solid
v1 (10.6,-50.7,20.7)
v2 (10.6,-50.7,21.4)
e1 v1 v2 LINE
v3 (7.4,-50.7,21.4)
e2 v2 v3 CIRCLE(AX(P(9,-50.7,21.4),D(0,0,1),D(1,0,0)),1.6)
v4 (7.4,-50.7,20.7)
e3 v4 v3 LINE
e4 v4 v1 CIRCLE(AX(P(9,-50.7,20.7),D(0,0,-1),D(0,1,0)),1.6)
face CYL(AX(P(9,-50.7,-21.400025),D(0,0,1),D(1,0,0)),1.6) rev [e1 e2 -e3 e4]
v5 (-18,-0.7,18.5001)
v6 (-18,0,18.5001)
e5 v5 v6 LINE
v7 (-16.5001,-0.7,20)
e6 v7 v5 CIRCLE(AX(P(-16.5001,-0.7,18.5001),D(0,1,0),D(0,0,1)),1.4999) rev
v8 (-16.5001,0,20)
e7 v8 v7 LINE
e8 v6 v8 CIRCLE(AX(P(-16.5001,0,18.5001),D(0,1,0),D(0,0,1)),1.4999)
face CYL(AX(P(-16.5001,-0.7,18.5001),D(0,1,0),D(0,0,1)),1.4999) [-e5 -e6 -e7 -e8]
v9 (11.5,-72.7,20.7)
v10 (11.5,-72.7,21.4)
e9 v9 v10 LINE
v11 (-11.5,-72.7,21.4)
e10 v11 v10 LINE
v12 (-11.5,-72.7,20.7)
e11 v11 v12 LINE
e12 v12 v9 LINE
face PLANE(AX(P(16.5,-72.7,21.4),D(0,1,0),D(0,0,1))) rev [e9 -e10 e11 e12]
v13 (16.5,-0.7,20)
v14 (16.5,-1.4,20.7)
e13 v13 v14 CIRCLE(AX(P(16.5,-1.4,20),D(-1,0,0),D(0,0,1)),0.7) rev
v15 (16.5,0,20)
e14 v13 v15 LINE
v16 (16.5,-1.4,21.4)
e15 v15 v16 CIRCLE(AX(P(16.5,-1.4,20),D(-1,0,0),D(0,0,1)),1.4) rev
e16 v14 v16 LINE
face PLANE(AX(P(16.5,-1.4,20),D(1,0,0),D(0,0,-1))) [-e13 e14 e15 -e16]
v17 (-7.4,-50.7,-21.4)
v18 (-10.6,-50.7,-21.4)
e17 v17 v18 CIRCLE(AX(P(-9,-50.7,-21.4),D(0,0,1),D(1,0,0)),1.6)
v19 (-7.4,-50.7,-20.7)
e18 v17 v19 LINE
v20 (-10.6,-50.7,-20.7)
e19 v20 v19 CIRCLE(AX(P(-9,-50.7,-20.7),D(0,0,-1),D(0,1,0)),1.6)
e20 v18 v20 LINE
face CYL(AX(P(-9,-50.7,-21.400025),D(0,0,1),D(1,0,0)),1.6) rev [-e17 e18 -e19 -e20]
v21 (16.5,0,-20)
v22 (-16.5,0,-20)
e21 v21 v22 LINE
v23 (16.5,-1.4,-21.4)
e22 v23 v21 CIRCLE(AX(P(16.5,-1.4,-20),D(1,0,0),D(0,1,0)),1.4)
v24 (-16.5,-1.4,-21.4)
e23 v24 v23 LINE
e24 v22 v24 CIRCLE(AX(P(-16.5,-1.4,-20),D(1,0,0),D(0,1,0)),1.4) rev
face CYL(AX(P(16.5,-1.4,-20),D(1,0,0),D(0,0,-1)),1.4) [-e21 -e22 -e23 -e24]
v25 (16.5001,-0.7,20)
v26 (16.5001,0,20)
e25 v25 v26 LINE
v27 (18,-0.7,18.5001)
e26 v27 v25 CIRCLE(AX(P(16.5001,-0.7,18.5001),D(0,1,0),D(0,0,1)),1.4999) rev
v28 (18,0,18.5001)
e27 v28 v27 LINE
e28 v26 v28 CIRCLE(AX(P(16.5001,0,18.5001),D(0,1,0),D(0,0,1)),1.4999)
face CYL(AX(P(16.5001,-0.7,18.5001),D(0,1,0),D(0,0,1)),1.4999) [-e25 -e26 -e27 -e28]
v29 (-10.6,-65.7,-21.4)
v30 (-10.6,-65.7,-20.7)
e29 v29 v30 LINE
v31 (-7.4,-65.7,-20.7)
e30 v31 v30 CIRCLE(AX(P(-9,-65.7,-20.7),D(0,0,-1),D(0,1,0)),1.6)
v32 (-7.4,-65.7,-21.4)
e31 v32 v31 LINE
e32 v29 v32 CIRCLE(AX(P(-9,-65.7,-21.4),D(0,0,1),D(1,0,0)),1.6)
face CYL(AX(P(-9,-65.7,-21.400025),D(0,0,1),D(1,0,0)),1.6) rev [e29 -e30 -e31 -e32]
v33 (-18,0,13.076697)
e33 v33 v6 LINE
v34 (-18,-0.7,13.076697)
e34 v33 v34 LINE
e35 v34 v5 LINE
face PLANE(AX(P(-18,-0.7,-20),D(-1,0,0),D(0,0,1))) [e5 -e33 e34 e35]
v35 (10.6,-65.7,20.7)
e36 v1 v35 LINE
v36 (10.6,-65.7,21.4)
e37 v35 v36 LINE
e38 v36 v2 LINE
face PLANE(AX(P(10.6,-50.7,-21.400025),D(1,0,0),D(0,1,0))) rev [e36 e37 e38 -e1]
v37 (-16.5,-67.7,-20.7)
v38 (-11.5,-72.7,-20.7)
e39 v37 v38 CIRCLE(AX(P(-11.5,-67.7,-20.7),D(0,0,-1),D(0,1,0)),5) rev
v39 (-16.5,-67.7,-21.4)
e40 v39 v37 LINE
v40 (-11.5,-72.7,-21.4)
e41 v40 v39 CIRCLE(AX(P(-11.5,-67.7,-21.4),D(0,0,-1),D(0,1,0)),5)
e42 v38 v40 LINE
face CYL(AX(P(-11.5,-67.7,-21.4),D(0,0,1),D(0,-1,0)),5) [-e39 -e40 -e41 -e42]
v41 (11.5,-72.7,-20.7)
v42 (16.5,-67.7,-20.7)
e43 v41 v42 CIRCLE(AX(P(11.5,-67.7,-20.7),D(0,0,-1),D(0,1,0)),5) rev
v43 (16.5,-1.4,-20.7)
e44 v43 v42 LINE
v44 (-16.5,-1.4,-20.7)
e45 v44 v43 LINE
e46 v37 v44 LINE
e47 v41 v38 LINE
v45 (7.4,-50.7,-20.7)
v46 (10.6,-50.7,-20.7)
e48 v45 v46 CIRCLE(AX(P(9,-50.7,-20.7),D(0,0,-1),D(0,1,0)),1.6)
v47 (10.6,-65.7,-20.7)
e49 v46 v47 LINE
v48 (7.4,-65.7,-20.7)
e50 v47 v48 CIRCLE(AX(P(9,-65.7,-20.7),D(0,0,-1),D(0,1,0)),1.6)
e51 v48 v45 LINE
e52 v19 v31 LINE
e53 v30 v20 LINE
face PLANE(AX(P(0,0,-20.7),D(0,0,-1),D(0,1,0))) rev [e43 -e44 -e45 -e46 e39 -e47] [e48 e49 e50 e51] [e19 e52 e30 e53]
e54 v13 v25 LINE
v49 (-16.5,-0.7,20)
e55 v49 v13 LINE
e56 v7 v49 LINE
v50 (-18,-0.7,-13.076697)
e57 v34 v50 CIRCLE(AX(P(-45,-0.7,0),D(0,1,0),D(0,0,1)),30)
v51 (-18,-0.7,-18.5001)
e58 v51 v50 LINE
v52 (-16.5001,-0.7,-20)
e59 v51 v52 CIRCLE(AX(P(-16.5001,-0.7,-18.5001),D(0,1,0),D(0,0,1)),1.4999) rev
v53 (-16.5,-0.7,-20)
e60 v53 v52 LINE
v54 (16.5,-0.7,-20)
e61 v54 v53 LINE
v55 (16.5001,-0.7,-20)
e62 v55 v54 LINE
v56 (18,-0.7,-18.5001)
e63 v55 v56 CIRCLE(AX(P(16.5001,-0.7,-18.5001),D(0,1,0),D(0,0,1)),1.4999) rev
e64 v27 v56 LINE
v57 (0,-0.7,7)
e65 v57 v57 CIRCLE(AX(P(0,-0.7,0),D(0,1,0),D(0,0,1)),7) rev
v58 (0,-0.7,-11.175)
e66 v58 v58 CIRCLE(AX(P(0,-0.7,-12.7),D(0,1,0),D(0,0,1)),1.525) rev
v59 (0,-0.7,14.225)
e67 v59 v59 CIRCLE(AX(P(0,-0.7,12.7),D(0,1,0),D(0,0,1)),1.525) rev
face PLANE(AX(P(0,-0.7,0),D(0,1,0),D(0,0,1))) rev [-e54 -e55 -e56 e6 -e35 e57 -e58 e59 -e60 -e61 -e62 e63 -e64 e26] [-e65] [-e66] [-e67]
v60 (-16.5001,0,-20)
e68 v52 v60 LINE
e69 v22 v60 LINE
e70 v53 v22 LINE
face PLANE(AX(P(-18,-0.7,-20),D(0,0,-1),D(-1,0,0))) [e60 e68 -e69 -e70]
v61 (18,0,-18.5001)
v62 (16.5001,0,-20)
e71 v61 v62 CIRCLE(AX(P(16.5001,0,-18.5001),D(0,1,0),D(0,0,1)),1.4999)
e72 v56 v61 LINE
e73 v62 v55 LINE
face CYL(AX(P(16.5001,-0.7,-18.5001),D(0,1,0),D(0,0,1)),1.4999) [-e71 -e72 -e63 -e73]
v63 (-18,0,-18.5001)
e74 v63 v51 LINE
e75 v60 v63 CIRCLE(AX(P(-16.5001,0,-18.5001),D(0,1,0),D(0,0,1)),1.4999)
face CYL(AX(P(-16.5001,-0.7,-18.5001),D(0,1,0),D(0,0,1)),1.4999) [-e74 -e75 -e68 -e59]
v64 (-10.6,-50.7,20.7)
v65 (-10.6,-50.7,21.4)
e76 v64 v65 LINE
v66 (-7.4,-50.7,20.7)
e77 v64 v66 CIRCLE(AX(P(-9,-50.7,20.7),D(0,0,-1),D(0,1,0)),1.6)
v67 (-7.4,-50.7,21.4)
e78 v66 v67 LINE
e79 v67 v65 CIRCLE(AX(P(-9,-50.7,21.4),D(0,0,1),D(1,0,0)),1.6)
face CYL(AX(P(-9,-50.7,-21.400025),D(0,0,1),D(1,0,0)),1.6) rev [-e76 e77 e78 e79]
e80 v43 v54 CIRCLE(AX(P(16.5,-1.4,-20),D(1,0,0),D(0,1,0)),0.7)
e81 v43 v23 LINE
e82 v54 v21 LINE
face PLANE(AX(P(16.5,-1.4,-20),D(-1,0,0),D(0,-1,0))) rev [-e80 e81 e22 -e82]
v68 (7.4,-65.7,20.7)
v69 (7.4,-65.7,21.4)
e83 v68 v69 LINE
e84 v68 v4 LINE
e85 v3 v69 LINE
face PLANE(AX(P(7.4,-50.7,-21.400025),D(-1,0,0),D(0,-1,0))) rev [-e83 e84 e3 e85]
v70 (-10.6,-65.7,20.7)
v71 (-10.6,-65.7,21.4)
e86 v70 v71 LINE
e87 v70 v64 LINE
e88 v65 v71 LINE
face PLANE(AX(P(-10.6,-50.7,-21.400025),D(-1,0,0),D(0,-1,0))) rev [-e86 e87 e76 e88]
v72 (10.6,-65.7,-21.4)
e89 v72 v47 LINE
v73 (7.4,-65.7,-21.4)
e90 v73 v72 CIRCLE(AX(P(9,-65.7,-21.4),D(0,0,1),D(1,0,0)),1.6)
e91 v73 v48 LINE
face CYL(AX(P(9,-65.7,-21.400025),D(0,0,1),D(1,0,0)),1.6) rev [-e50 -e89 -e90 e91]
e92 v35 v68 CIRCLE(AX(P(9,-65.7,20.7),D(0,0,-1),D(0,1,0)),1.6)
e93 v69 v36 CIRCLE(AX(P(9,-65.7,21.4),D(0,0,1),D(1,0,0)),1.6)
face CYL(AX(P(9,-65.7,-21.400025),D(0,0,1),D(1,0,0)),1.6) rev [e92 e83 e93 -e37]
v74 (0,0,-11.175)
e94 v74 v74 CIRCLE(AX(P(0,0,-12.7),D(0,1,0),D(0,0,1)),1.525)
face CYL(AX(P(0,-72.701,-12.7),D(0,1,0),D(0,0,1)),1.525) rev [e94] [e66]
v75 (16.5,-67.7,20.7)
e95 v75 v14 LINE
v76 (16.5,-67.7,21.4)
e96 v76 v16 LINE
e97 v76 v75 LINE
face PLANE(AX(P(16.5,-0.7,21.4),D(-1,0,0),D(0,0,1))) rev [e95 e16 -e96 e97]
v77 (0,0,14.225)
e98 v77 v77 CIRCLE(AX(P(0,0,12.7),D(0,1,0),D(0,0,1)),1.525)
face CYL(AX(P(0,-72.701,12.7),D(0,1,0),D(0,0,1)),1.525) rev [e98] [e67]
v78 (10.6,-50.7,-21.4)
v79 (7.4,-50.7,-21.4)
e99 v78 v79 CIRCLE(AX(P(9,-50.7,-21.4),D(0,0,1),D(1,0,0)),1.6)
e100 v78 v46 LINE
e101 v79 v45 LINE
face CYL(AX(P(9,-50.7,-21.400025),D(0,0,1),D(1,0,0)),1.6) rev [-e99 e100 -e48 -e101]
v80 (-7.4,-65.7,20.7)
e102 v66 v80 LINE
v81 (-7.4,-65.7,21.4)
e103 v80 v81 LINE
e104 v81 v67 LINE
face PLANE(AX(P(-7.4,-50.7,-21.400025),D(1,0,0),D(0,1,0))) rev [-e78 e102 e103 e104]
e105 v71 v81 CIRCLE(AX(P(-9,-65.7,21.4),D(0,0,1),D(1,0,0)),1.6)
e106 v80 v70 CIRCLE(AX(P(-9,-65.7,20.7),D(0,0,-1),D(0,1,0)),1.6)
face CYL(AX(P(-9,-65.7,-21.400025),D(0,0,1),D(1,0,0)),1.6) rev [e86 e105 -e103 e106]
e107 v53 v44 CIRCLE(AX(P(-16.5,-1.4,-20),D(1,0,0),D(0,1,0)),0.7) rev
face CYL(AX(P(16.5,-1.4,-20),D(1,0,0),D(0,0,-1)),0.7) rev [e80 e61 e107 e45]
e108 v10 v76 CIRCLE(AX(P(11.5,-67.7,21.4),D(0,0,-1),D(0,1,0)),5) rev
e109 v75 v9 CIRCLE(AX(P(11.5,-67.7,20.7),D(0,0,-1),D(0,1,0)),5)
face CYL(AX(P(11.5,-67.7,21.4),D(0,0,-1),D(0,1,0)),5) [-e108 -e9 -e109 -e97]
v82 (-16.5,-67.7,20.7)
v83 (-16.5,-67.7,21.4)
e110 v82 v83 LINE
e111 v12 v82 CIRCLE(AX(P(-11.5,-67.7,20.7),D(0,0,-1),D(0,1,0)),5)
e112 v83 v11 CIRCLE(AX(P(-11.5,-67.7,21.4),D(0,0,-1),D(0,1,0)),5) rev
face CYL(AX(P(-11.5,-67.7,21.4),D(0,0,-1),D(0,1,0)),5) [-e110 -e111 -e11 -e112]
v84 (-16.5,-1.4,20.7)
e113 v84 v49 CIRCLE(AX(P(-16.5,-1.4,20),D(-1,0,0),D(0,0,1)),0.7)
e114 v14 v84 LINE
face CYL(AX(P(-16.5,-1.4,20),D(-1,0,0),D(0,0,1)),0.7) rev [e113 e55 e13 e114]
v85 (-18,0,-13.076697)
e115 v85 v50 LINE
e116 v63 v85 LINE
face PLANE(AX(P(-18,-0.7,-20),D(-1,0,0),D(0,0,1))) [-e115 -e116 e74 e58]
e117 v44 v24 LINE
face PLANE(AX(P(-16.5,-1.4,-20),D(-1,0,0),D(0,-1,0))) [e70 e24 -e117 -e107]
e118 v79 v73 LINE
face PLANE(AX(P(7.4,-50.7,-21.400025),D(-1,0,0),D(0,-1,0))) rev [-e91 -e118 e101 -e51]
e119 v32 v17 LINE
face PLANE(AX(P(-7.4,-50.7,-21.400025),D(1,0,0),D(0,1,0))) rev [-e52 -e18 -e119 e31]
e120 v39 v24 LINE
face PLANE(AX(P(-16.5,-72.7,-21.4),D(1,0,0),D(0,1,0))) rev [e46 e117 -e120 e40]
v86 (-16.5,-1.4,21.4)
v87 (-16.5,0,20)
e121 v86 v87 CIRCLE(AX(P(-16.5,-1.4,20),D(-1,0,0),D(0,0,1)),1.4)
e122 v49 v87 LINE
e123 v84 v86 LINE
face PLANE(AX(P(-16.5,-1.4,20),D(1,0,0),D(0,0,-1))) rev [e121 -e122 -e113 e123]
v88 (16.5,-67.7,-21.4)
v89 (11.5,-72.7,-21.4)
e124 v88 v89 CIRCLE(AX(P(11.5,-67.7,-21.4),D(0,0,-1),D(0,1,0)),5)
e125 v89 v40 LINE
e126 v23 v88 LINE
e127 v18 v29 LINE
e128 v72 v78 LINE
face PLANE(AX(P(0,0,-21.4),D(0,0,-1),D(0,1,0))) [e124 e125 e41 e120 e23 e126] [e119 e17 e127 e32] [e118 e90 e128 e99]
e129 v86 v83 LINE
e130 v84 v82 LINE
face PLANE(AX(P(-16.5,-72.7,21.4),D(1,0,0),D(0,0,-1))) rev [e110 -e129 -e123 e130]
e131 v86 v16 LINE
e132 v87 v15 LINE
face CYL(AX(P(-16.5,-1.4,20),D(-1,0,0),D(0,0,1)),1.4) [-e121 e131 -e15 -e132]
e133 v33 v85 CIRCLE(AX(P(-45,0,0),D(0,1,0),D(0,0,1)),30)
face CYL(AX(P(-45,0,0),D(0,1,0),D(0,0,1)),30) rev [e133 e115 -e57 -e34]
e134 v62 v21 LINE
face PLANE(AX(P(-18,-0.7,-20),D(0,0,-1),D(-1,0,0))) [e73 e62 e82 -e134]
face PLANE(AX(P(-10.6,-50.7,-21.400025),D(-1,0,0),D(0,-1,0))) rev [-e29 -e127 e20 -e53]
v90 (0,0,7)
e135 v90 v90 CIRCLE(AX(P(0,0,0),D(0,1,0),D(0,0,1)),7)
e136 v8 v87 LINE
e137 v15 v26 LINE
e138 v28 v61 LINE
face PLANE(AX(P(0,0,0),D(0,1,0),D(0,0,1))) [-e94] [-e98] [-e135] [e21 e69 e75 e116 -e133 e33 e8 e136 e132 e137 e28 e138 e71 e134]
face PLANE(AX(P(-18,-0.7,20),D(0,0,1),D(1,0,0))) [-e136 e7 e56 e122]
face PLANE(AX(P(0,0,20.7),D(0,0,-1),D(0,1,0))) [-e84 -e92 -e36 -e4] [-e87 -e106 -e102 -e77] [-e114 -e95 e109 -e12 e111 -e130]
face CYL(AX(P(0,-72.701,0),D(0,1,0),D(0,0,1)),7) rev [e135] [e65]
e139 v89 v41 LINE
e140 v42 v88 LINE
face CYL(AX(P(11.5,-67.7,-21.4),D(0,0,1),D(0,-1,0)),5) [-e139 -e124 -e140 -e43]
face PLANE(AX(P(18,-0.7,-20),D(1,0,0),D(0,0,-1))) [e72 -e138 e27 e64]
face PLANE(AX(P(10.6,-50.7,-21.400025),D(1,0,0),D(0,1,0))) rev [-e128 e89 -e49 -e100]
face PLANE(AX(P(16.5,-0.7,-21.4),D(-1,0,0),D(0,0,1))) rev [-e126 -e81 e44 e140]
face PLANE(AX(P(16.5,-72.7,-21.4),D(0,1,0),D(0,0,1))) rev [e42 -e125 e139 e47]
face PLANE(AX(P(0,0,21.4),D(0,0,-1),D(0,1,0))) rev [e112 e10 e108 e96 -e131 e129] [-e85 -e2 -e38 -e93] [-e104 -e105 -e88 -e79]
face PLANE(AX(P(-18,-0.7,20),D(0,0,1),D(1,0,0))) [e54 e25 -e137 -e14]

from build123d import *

# Parameters (mm, degrees)
SKETCH1_W               = 36
SKETCH1_H               = 40
BASE_FLANGE1_DEPTH      = 0.7
EDGE_FLANGE1_DEPTH      = 33
EDGE_FLANGE1_BEND_DEPTH = 33
BREAK_CORNER1_START     = -0.7
BREAK_CORNER1_DEPTH     = 0.7
BREAK_CORNER2_START     = -21.4
BREAK_CORNER2_DEPTH     = 42.8
CUT_EXTRUDE1_DEPTH      = 78.892554201
CUT_EXTRUDE1_DEPTH_BACK = 78.892554201
CUT_EXTRUDE2_REACH      = 79.893
SKETCH11_R              = 7
SKETCH11_R_2            = 1.525
CUT_EXTRUDE3_REACH      = 79.893
SKETCH12_R              = 30


# Read off the part's stored shape, not the designer's step: Break-Corner1, Break-Corner2
# Sheet-metal steps are written as plain solids
with BuildPart() as part:
    # Sketch1 → Base-Flange1 (new body)
    with BuildSketch(Plane(origin=(0, 0, 0), x_dir=(1, 0, 0), z_dir=(0, 1, 0))):
        Rectangle(SKETCH1_W, SKETCH1_H)
    extrude(amount=-BASE_FLANGE1_DEPTH)

    # Edge-Flange1 section (across the edge) → Edge-Flange1 (add)
    with BuildSketch(Plane(origin=(16.5, -0.7, 20.7), x_dir=(0, 0, -1), z_dir=(-1, 0, 0))):
        with BuildLine():
            Line((-0.7, 0.7), (-0.7, 72))
            Line((-0.7, 72), (0, 72))
            Line((0, 72), (0, 0.7))
            ThreePointArc((0, 0.7), (0.205025253, 0.205025253), (0.7, 0))
            Line((0.7, 0), (0.7, -0.7))
            ThreePointArc((0.7, -0.7), (-0.289949494, -0.289949494), (-0.7, 0.7))
        make_face()
    extrude(amount=EDGE_FLANGE1_DEPTH)

    # Edge-Flange1 section 2 (across the edge) → Edge-Flange1 bend (add)
    with BuildSketch(Plane(origin=(-16.5, -0.7, -20.7), x_dir=(0, 0, 1), z_dir=(1, 0, 0))):
        with BuildLine():
            Line((-0.7, 0.7), (-0.7, 72))
            Line((-0.7, 72), (0, 72))
            Line((0, 72), (0, 0.7))
            ThreePointArc((0, 0.7), (0.205025253, 0.205025253), (0.7, 0))
            Line((0.7, 0), (0.7, -0.7))
            ThreePointArc((0.7, -0.7), (-0.289949494, -0.289949494), (-0.7, 0.7))
        make_face()
    extrude(amount=EDGE_FLANGE1_BEND_DEPTH)

    # Break-Corner1 outline → Break-Corner1 (cut)
    with BuildSketch(Plane(origin=(0, 0, 0), x_dir=(1, 0, 0), z_dir=(0, 1, 0)).offset(BREAK_CORNER1_START)):
        with BuildLine():
            Line((18, -20), (18, -18.5001))
            ThreePointArc((18, -18.5001), (17.560689461, -19.560689461), (16.5001, -20))
            Line((16.5001, -20), (18, -20))
        make_face()
        with BuildLine():
            ThreePointArc((16.5001, 20), (17.560689461, 19.560689461), (18, 18.5001))
            Line((18, 18.5001), (18, 20))
            Line((18, 20), (16.5001, 20))
        make_face()
        with BuildLine():
            ThreePointArc((-16.5001, -20), (-17.560689461, -19.560689461), (-18, -18.5001))
            Line((-18, -18.5001), (-18, -20))
            Line((-18, -20), (-16.5001, -20))
        make_face()
        with BuildLine():
            ThreePointArc((-18, 18.5001), (-17.560689461, 19.560689461), (-16.5001, 20))
            Line((-16.5001, 20), (-18, 20))
            Line((-18, 20), (-18, 18.5001))
        make_face()
    extrude(amount=BREAK_CORNER1_DEPTH, mode=Mode.SUBTRACT)

    # Break-Corner2 outline → Break-Corner2 (cut)
    with BuildSketch(Plane.XY.offset(BREAK_CORNER2_START)):
        with BuildLine():
            ThreePointArc((16.5, -67.7), (15.035533906, -71.235533906), (11.5, -72.7))
            Line((11.5, -72.7), (16.5, -72.7))
            Line((16.5, -72.7), (16.5, -67.7))
        make_face()
        with BuildLine():
            Line((-16.5, -72.7), (-11.5, -72.7))
            ThreePointArc((-11.5, -72.7), (-15.035533906, -71.235533906), (-16.5, -67.7))
            Line((-16.5, -67.7), (-16.5, -72.7))
        make_face()
    extrude(amount=BREAK_CORNER2_DEPTH, mode=Mode.SUBTRACT)

    # Sketch10 → Cut-Extrude1 (cut, two sides: drawn at the far end of the back side and taken through both)
    with BuildSketch(Plane.XY.offset(-CUT_EXTRUDE1_DEPTH_BACK)):
        with BuildLine():
            Line((-7.4, -50.7), (-7.4, -65.7))
            ThreePointArc((-7.4, -65.7), (-9, -67.3), (-10.6, -65.7))
            Line((-10.6, -65.7), (-10.6, -50.7))
            ThreePointArc((-10.6, -50.7), (-9, -49.1), (-7.4, -50.7))
        make_face()
        with BuildLine():
            Line((7.4, -50.7), (7.4, -65.7))
            ThreePointArc((7.4, -65.7), (9, -67.3), (10.6, -65.7))
            Line((10.6, -65.7), (10.6, -50.7))
            ThreePointArc((10.6, -50.7), (9, -49.1), (7.4, -50.7))
        make_face()
    extrude(amount=CUT_EXTRUDE1_DEPTH + CUT_EXTRUDE1_DEPTH_BACK, mode=Mode.SUBTRACT)

    # Sketch11 → Cut-Extrude2 (cut, up to next)
    with BuildSketch(Plane(origin=(0, 0, 0), x_dir=(1, 0, 0), z_dir=(0, 1, 0)), mode=Mode.PRIVATE) as cut_extrude2_sk1:
        with Locations(Location((0, 0, 0), (0, 0, 270))):
            Circle(SKETCH11_R)
    cut_extrude2_tool1 = extrude(cut_extrude2_sk1.sketch, amount=-CUT_EXTRUDE2_REACH, mode=Mode.PRIVATE) & part.part
    # Sketch11 → Cut-Extrude2 (cut, up to next)
    with BuildSketch(Plane(origin=(0, 0, 0), x_dir=(1, 0, 0), z_dir=(0, 1, 0)), mode=Mode.PRIVATE) as cut_extrude2_sk2:
        with Locations(Location((0, -12.7, 0), (0, 0, 270))):
            Circle(SKETCH11_R_2)
    cut_extrude2_tool2 = extrude(cut_extrude2_sk2.sketch, amount=-CUT_EXTRUDE2_REACH, mode=Mode.PRIVATE) & part.part
    # Sketch11 → Cut-Extrude2 (cut, up to next)
    with BuildSketch(Plane(origin=(0, 0, 0), x_dir=(1, 0, 0), z_dir=(0, 1, 0)), mode=Mode.PRIVATE) as cut_extrude2_sk3:
        with Locations(Location((0, 12.7, 0), (0, 0, 270))):
            Circle(SKETCH11_R_2)
    cut_extrude2_tool3 = extrude(cut_extrude2_sk3.sketch, amount=-CUT_EXTRUDE2_REACH, mode=Mode.PRIVATE) & part.part
    add(cut_extrude2_tool1.solids().sort_by_distance((0, 0, 0))[0], mode=Mode.SUBTRACT)
    add(cut_extrude2_tool2.solids().sort_by_distance((0, 0, 12.7))[0], mode=Mode.SUBTRACT)
    add(cut_extrude2_tool3.solids().sort_by_distance((0, 0, -12.7))[0], mode=Mode.SUBTRACT)

    # Sketch12 → Cut-Extrude3 (cut, up to next)
    with BuildSketch(Plane(origin=(0, 0, 0), x_dir=(1, 0, 0), z_dir=(0, 1, 0)), mode=Mode.PRIVATE) as cut_extrude3_sk1:
        with Locations((-45, 0)):
            Circle(SKETCH12_R)
    cut_extrude3_tool1 = extrude(cut_extrude3_sk1.sketch, amount=-CUT_EXTRUDE3_REACH, mode=Mode.PRIVATE) & part.part
    add(cut_extrude3_tool1.solids().sort_by_distance((-45, 0, 0))[0], mode=Mode.SUBTRACT)


solid = part.part
